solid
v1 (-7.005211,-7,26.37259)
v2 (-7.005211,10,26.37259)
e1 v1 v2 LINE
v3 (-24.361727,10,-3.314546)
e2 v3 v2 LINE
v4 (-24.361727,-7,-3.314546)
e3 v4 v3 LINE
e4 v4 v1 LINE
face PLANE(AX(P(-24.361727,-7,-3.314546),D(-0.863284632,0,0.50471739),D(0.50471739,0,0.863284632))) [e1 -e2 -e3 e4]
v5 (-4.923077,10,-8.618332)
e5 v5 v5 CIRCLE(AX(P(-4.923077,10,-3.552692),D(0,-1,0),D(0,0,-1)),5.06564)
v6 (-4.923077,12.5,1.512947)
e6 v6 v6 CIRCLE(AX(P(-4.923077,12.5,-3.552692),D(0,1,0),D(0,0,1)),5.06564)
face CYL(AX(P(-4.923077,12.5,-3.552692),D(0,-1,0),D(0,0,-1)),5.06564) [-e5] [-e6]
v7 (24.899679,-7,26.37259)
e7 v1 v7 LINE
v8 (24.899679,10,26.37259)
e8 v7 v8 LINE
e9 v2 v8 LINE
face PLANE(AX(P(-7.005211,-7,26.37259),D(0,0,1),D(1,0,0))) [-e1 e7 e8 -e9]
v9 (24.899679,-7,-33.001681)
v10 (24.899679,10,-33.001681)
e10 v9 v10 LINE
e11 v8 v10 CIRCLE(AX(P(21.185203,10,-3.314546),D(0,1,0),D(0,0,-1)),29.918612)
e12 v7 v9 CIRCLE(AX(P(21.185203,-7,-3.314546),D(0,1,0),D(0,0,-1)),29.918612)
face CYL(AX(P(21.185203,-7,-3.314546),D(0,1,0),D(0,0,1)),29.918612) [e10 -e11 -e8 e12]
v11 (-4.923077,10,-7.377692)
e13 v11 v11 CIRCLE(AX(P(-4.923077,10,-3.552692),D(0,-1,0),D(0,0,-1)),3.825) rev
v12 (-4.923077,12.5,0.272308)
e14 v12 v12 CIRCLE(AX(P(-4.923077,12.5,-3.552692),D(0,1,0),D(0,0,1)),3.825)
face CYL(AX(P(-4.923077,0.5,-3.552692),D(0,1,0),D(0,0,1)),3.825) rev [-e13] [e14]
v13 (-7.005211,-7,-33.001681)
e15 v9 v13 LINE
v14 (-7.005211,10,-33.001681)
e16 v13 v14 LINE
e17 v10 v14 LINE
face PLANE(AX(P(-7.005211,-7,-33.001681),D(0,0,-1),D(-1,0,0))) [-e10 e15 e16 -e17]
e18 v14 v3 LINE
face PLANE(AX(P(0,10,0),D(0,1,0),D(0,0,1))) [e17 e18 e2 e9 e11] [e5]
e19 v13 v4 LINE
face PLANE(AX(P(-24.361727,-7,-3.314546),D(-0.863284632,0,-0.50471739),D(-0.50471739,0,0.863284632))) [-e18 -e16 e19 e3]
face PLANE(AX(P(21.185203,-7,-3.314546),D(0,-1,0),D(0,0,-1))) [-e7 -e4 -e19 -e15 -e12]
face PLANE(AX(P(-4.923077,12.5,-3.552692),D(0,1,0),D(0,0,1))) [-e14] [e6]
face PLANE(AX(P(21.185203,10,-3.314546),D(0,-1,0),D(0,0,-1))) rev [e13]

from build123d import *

# Parameters (mm, degrees)
SKETCH2_W            = 49
SKETCH2_H            = 20
BOSS_EXTRUDE1_DEPTH  = 10
SKETCH3_W            = 30
SKETCH3_H            = 3.02
CUT_EXTRUDE1_DEPTH   = 2
SKETCH4_W            = 5
SKETCH4_H            = 6
CUT_EXTRUDE2_DEPTH   = 5
SKETCH5_R            = 7
CUT_EXTRUDE3_DEPTH   = 38.474986727
SKETCH12_W           = 5
SKETCH12_H           = 6
BOSS_EXTRUDE4_DEPTH  = 0.8
SKETCH14_W           = 29.5
SKETCH14_H           = 6
CUT_EXTRUDE6_DEPTH   = 42.177221974
SKETCH20_W           = 5
SKETCH20_H           = 6
BOSS_EXTRUDE6_DEPTH  = 4.2
SKETCH21_R           = 4.6
CUT_EXTRUDE8_DEPTH   = 0.5
SKETCH22_R           = 3.825
CUT_EXTRUDE9_DEPTH   = 4
SKETCH24_R           = 4.6
SKETCH24_R_2         = 4.25
CUT_EXTRUDE11_DEPTH  = 1
BOSS_EXTRUDE9_START  = 8
SKETCH26_R           = 5.065639608
SKETCH26_R_2         = 3.825
BOSS_EXTRUDE9_DEPTH  = 8
SKETCH27_R           = 7
SKETCH27_R_2         = 4.6
CUT_EXTRUDE12_DEPTH  = 1
FILLET1_R            = 0.5
SKETCH56_R           = 2
CUT_EXTRUDE13_DEPTH  = 2
SKETCH57_W           = 3
SKETCH57_H           = 6
BOSS_EXTRUDE19_DEPTH = 5.3
CUT_EXTRUDE14_REACH  = 50.729
SKETCH58_R           = 1.5
FILLET2_R            = 0.3
FILLET3_R            = 0.8
SKETCH60_W           = 19
SKETCH60_H           = 4
BOSS_EXTRUDE21_DEPTH = 1
SKETCH59_W           = 22.86
SKETCH59_H           = 13
BOSS_EXTRUDE20_DEPTH = 11
CUT_EXTRUDE15_REACH  = 49.914
SKETCH61_R           = 2.5
FILLET4_R            = 4
BOSS_EXTRUDE22_DEPTH = 17


with BuildPart() as part:
    # Sketch2 → Boss-Extrude1 (new body)
    with BuildSketch(Plane(origin=(0, 0, 0), x_dir=(1, 0, 0), z_dir=(0, 1, 0))):
        with Locations((10.076923077, 3.557692308)):
            Rectangle(SKETCH2_W, SKETCH2_H)
    extrude(amount=BOSS_EXTRUDE1_DEPTH)

    # Sketch3 → Cut-Extrude1 (cut)
    with BuildSketch(Plane.XZ):
        with Locations((12.576923077, -3.557692308)):
            Rectangle(SKETCH3_W, SKETCH3_H)
    extrude(amount=-CUT_EXTRUDE1_DEPTH, mode=Mode.SUBTRACT)

    # Sketch4 → Cut-Extrude2 (cut)
    with BuildSketch(Plane.XZ):
        with Locations((-4.923076923, -3.547692308)):
            Rectangle(SKETCH4_W, SKETCH4_H)
    extrude(amount=-CUT_EXTRUDE2_DEPTH, mode=Mode.SUBTRACT)

    # Sketch5 → Cut-Extrude3 (cut, through all)
    with BuildSketch(Plane.XZ.offset(-5)):
        with Locations(Location((-4.923076923, -3.552692308, 0), (0, 0, 270))):
            Circle(SKETCH5_R)
    extrude(amount=-CUT_EXTRUDE3_DEPTH, mode=Mode.SUBTRACT)

    # Sketch12 → Boss-Extrude4 (add)
    with BuildSketch(Plane.XZ):
        with Locations((-4.923076923, -3.547692308)):
            Rectangle(SKETCH12_W, SKETCH12_H)
    extrude(amount=-BOSS_EXTRUDE4_DEPTH)

    # Sketch14 → Cut-Extrude6 (cut, through all)
    with BuildSketch(Plane.XY.offset(6.442307692)):
        with Locations((19.826923077, 7)):
            Rectangle(SKETCH14_W, SKETCH14_H)
    extrude(amount=-CUT_EXTRUDE6_DEPTH, mode=Mode.SUBTRACT)

    # Sketch20 → Boss-Extrude6 (add)
    with BuildSketch(Plane(origin=(0, 0.8, 0), x_dir=(1, 0, 0), z_dir=(0, 1, 0))):
        with Locations((-4.923076923, 3.547692308)):
            Rectangle(SKETCH20_W, SKETCH20_H)
    extrude(amount=BOSS_EXTRUDE6_DEPTH)

    # Sketch21 → Cut-Extrude8 (cut)
    with BuildSketch(Plane(origin=(0, 5, 0), x_dir=(1, 0, 0), z_dir=(0, 1, 0))):
        with Locations(Location((-4.923076923, 3.552692308, 0), (0, 0, 270))):
            Circle(SKETCH21_R)
    extrude(amount=-CUT_EXTRUDE8_DEPTH, mode=Mode.SUBTRACT)

    # Sketch22 → Cut-Extrude9 (cut)
    with BuildSketch(Plane(origin=(0, 4.5, 0), x_dir=(1, 0, 0), z_dir=(0, 1, 0))):
        with Locations(Location((-4.923076923, 3.552692308, 0), (0, 0, 270))):
            Circle(SKETCH22_R)
    extrude(amount=-CUT_EXTRUDE9_DEPTH, mode=Mode.SUBTRACT)

    # Sketch24 → Cut-Extrude11 (cut)
    with BuildSketch(Plane(origin=(0, 5, 0), x_dir=(1, 0, 0), z_dir=(0, 1, 0))):
        with Locations(Location((-4.923076923, 3.552692308, 0), (0, 0, 270))):
            Circle(SKETCH24_R)
        with Locations(Location((-4.923076923, 3.552692308, 0), (0, 0, 270))):
            Circle(SKETCH24_R_2, mode=Mode.SUBTRACT)
    extrude(amount=-CUT_EXTRUDE11_DEPTH, mode=Mode.SUBTRACT)

    # Sketch26 → Boss-Extrude9 (add)
    with BuildSketch(Plane(origin=(0, 4.5, 0), x_dir=(1, 0, 0), z_dir=(0, 1, 0)).offset(BOSS_EXTRUDE9_START)):
        with Locations(Location((-4.923076923, 3.552692308, 0), (0, 0, 90))):
            Circle(SKETCH26_R)
        with Locations(Location((-4.923076923, 3.552692308, 0), (0, 0, 270))):
            Circle(SKETCH26_R_2, mode=Mode.SUBTRACT)
    extrude(amount=-BOSS_EXTRUDE9_DEPTH)

    # Sketch27 → Cut-Extrude12 (cut)
    with BuildSketch(Plane(origin=(0, 5, 0), x_dir=(1, 0, 0), z_dir=(0, 1, 0))):
        with Locations(Location((-4.923076923, 3.552692308, 0), (0, 0, 90))):
            Circle(SKETCH27_R)
        with Locations(Location((-4.923076923, 3.552692308, 0), (0, 0, 270))):
            Circle(SKETCH27_R_2, mode=Mode.SUBTRACT)
    extrude(amount=-CUT_EXTRUDE12_DEPTH, mode=Mode.SUBTRACT)

    # Fillet1
    fillet1_edges = [part.edges().sort_by_distance(p)[0] for p in [
        (5.076923077, 4, -3.557692308),
    ]]
    fillet(fillet1_edges, radius=FILLET1_R)

    # Sketch56 → Cut-Extrude13 (cut)
    with BuildSketch(Plane.XZ):
        with Locations((28.926923077, -3.557692308)):
            Circle(SKETCH56_R)
    extrude(amount=-CUT_EXTRUDE13_DEPTH, mode=Mode.SUBTRACT)

    # Sketch57 → Boss-Extrude19 (add)
    with BuildSketch(Plane(origin=(0, 4, 0), x_dir=(1, 0, 0), z_dir=(0, 1, 0))):
        with Locations((29.181923077, 3.557692308)):
            Rectangle(SKETCH57_W, SKETCH57_H)
        with Locations((22.931923077, 3.557692308)):
            Rectangle(SKETCH57_W, SKETCH57_H)
    extrude(amount=BOSS_EXTRUDE19_DEPTH)

    # Cut-Extrude14: up to this face of the body (flat: up to its plane)
    cut_extrude14_end = Plane(part.part.faces().sort_by_distance((21.431923077, 6.65, -3.557692308))[0])
    # Sketch58 → Cut-Extrude14 (cut, up to the picked face)
    with BuildSketch(Plane(origin=(30.681923077, 0, 0), x_dir=(0, 0, -1), z_dir=(1, 0, 0)), mode=Mode.PRIVATE) as cut_extrude14_sk1:
        with Locations(Location((3.557692308, 7, 0), (0, 0, 180))):
            Circle(SKETCH58_R)
    cut_extrude14_tool1 = split(extrude(cut_extrude14_sk1.sketch, amount=-CUT_EXTRUDE14_REACH, mode=Mode.PRIVATE), bisect_by=cut_extrude14_end, keep=Keep.BOTH, mode=Mode.PRIVATE)
    add(cut_extrude14_tool1.solids().sort_by(Axis((30.681923, 7, -3.557692), (-1, 0, 0)))[0], mode=Mode.SUBTRACT)

    # Fillet2
    fillet2_edges = [part.edges().sort_by_distance(p)[0] for p in [
        (27.681923077, 9.3, -3.557692308),
        (24.431923077, 9.3, -3.557692308),
    ]]
    fillet(fillet2_edges, radius=FILLET2_R)

    # Fillet3
    fillet3_edges = [part.edges().sort_by_distance(p)[0] for p in [
        (30.681923077, 4, -3.557692308),
        (30.681923077, 6.65, -0.557692308),
        (29.181923077, 4, -6.557692308),
        (30.681923077, 6.65, -6.557692308),
        (29.181923077, 4, -0.557692308),
        (21.431923077, 6.65, -6.557692308),
        (21.431923077, 6.65, -0.557692308),
        (22.931923077, 4, -6.557692308),
        (21.431923077, 4, -3.557692308),
        (22.931923077, 4, -0.557692308),
    ]]
    fillet(fillet3_edges, radius=FILLET3_R)

    # Sketch60 → Boss-Extrude21 (add)
    with BuildSketch(Plane(origin=(0, 0, -13.557692308), x_dir=(-1, 0, 0), z_dir=(0, 0, -1))):
        with Locations((-25.076923077, 2)):
            Rectangle(SKETCH60_W, SKETCH60_H)
    boss_extrude21 = extrude(amount=BOSS_EXTRUDE21_DEPTH)

    # Sketch59 → Boss-Extrude20 (add)
    with BuildSketch(Plane(origin=(0, 0, -14.557692308), x_dir=(-1, 0, 0), z_dir=(0, 0, -1))):
        with Locations((-26.956923077, 3.5)):
            Rectangle(SKETCH59_W, SKETCH59_H)
    boss_extrude20 = extrude(amount=BOSS_EXTRUDE20_DEPTH)

    # Mirror4: Boss-Extrude21, Boss-Extrude20 across plane
    add(boss_extrude21.mirror(Plane(origin=(0, 0, -3.557692308), x_dir=(1, 0, 0), z_dir=(0, 0, -1))))
    add(boss_extrude20.mirror(Plane(origin=(0, 0, -3.557692308), x_dir=(1, 0, 0), z_dir=(0, 0, -1))))

    # Sketch61 → Cut-Extrude15 (cut, up to next)
    with BuildSketch(Plane(origin=(0, 10, 0), x_dir=(1, 0, 0), z_dir=(0, 1, 0)), mode=Mode.PRIVATE) as cut_extrude15_sk1:
        with Locations(Location((20.406923077, 20.207692308, 0), (0, 0, 270))):
            Circle(SKETCH61_R)
    cut_extrude15_tool1 = extrude(cut_extrude15_sk1.sketch, amount=-CUT_EXTRUDE15_REACH, mode=Mode.PRIVATE) & part.part
    # Sketch61 → Cut-Extrude15 (cut, up to next)
    with BuildSketch(Plane(origin=(0, 10, 0), x_dir=(1, 0, 0), z_dir=(0, 1, 0)), mode=Mode.PRIVATE) as cut_extrude15_sk2:
        with Locations(Location((31.706923077, 20.207692308, 0), (0, 0, 270))):
            Circle(SKETCH61_R)
    cut_extrude15_tool2 = extrude(cut_extrude15_sk2.sketch, amount=-CUT_EXTRUDE15_REACH, mode=Mode.PRIVATE) & part.part
    # Sketch61 → Cut-Extrude15 (cut, up to next)
    with BuildSketch(Plane(origin=(0, 10, 0), x_dir=(1, 0, 0), z_dir=(0, 1, 0)), mode=Mode.PRIVATE) as cut_extrude15_sk3:
        with Locations(Location((31.706923077, -13.092307692, 0), (0, 0, 90))):
            Circle(SKETCH61_R)
    cut_extrude15_tool3 = extrude(cut_extrude15_sk3.sketch, amount=-CUT_EXTRUDE15_REACH, mode=Mode.PRIVATE) & part.part
    # Sketch61 → Cut-Extrude15 (cut, up to next)
    with BuildSketch(Plane(origin=(0, 10, 0), x_dir=(1, 0, 0), z_dir=(0, 1, 0)), mode=Mode.PRIVATE) as cut_extrude15_sk4:
        with Locations(Location((20.406923077, -13.092307692, 0), (0, 0, 90))):
            Circle(SKETCH61_R)
    cut_extrude15_tool4 = extrude(cut_extrude15_sk4.sketch, amount=-CUT_EXTRUDE15_REACH, mode=Mode.PRIVATE) & part.part
    add(cut_extrude15_tool1.solids().sort_by_distance((20.406923, 10, -20.207692))[0], mode=Mode.SUBTRACT)
    add(cut_extrude15_tool2.solids().sort_by_distance((31.706923, 10, -20.207692))[0], mode=Mode.SUBTRACT)
    add(cut_extrude15_tool3.solids().sort_by_distance((31.706923, 10, 13.092308))[0], mode=Mode.SUBTRACT)
    add(cut_extrude15_tool4.solids().sort_by_distance((20.406923, 10, 13.092308))[0], mode=Mode.SUBTRACT)

    # Fillet4
    # the kernel refuses this fillet: 4 mm, written as the material it takes off along each edge
    with BuildSketch(Plane(origin=(38.386923077, 20, -25.557692308), x_dir=(0, 0, 1), z_dir=(0, -1, 0)), Plane(origin=(15.526923077, -13, -25.557692308), x_dir=(0, 0, 1), z_dir=(0, 1, 0)), Plane(origin=(15.526923077, -13, 18.442307692), x_dir=(1, 0, 0), z_dir=(0, 1, 0))) as fillet4_piece_1:
        with BuildLine():
            CenterArc((FILLET4_R, FILLET4_R), FILLET4_R, 180, 90)
            Line((0, FILLET4_R), (0, 0))
            Line((0, 0), (FILLET4_R, 0))
        make_face()
    extrude(amount=33, mode=Mode.SUBTRACT)
    with BuildSketch(Plane(origin=(38.386923077, 20, -14.557692308), x_dir=(-1, 0, 0), z_dir=(0, -1, 0))) as fillet4_piece_2_section:
        with BuildLine():
            CenterArc((FILLET4_R, FILLET4_R), FILLET4_R, 180, 90)
            Line((0, FILLET4_R), (0, 0))
            Line((0, 0), (FILLET4_R, 0))
        make_face()
    fillet4_piece_2 = extrude(amount=33, mode=Mode.PRIVATE)
    fillet4_piece_2 = split(fillet4_piece_2, bisect_by=Plane(origin=(34.576923077, 12, -14.51845576), z_dir=(-1, 0, 0)), keep=Keep.TOP, mode=Mode.PRIVATE)
    fillet4_piece_2 = split(fillet4_piece_2, bisect_by=Plane(origin=(34.482800084, 4, -14.51845576), z_dir=(0, 1, 0)), keep=Keep.TOP, mode=Mode.PRIVATE)
    add(fillet4_piece_2, mode=Mode.SUBTRACT)
    with BuildSketch(Plane(origin=(38.386923077, 20, -14.557692308), x_dir=(-1, 0, 0), z_dir=(0, -1, 0))) as fillet4_piece_3_section:
        with BuildLine():
            CenterArc((FILLET4_R, FILLET4_R), FILLET4_R, 180, 90)
            Line((0, FILLET4_R), (0, 0))
            Line((0, 0), (FILLET4_R, 0))
        make_face()
    fillet4_piece_3 = extrude(amount=33, mode=Mode.PRIVATE)
    fillet4_piece_3 = split(fillet4_piece_3, bisect_by=Plane(origin=(34.576923077, 12, -15.466872512), z_dir=(1, 0, 0)), keep=Keep.TOP, mode=Mode.PRIVATE)
    fillet4_piece_3 = split(fillet4_piece_3, bisect_by=Plane(origin=(37.49276705, 4, -15.466872512), z_dir=(0, 1, 0)), keep=Keep.TOP, mode=Mode.PRIVATE)
    add(fillet4_piece_3, mode=Mode.SUBTRACT)
    with BuildSketch(Plane(origin=(38.386923077, 20, -14.557692308), x_dir=(-1, 0, 0), z_dir=(0, -1, 0))) as fillet4_piece_4_section:
        with BuildLine():
            CenterArc((FILLET4_R, FILLET4_R), FILLET4_R, 180, 90)
            Line((0, FILLET4_R), (0, 0))
            Line((0, 0), (FILLET4_R, 0))
        make_face()
    fillet4_piece_4 = extrude(amount=33, mode=Mode.PRIVATE)
    fillet4_piece_4 = split(fillet4_piece_4, bisect_by=Plane(origin=(34.576923077, 2, -15.466872512), z_dir=(1, 0, 0)), keep=Keep.TOP, mode=Mode.PRIVATE)
    fillet4_piece_4 = split(fillet4_piece_4, bisect_by=Plane(origin=(37.49276705, 0, -15.466872512), z_dir=(0, 1, 0)), keep=Keep.TOP, mode=Mode.PRIVATE)
    fillet4_piece_4 = split(fillet4_piece_4, bisect_by=Plane(origin=(37.49276705, 4, -15.466872512), z_dir=(0, -1, 0)), keep=Keep.TOP, mode=Mode.PRIVATE)
    add(fillet4_piece_4, mode=Mode.SUBTRACT)
    with BuildSketch(Plane(origin=(38.386923077, 20, -14.557692308), x_dir=(-1, 0, 0), z_dir=(0, -1, 0))) as fillet4_piece_5_section:
        with BuildLine():
            CenterArc((FILLET4_R, FILLET4_R), FILLET4_R, 180, 90)
            Line((0, FILLET4_R), (0, 0))
            Line((0, 0), (FILLET4_R, 0))
        make_face()
    fillet4_piece_5 = extrude(amount=33, mode=Mode.PRIVATE)
    fillet4_piece_5 = split(fillet4_piece_5, bisect_by=Plane(origin=(34.576923077, -6.5, -14.51845576), z_dir=(-1, 0, 0)), keep=Keep.TOP, mode=Mode.PRIVATE)
    fillet4_piece_5 = split(fillet4_piece_5, bisect_by=Plane(origin=(34.482800084, 0, -14.51845576), z_dir=(0, -1, 0)), keep=Keep.TOP, mode=Mode.PRIVATE)
    add(fillet4_piece_5, mode=Mode.SUBTRACT)
    with BuildSketch(Plane(origin=(38.386923077, 20, -14.557692308), x_dir=(-1, 0, 0), z_dir=(0, -1, 0))) as fillet4_piece_6_section:
        with BuildLine():
            CenterArc((FILLET4_R, FILLET4_R), FILLET4_R, 180, 90)
            Line((0, FILLET4_R), (0, 0))
            Line((0, 0), (FILLET4_R, 0))
        make_face()
    fillet4_piece_6 = extrude(amount=33, mode=Mode.PRIVATE)
    fillet4_piece_6 = split(fillet4_piece_6, bisect_by=Plane(origin=(34.576923077, -6.5, -15.466872512), z_dir=(1, 0, 0)), keep=Keep.TOP, mode=Mode.PRIVATE)
    fillet4_piece_6 = split(fillet4_piece_6, bisect_by=Plane(origin=(37.49276705, 0, -15.466872512), z_dir=(0, -1, 0)), keep=Keep.TOP, mode=Mode.PRIVATE)
    add(fillet4_piece_6, mode=Mode.SUBTRACT)
    with BuildSketch(Plane(origin=(38.386923077, 20, 7.442307692), x_dir=(0, 0, 1), z_dir=(0, -1, 0))) as fillet4_piece_7_section:
        with BuildLine():
            CenterArc((FILLET4_R, FILLET4_R), FILLET4_R, 180, 90)
            Line((0, FILLET4_R), (0, 0))
            Line((0, 0), (FILLET4_R, 0))
        make_face()
    fillet4_piece_7 = extrude(amount=33, mode=Mode.PRIVATE)
    fillet4_piece_7 = split(fillet4_piece_7, bisect_by=Plane(origin=(34.576923077, 12, 8.351487897), z_dir=(1, 0, 0)), keep=Keep.TOP, mode=Mode.PRIVATE)
    fillet4_piece_7 = split(fillet4_piece_7, bisect_by=Plane(origin=(37.49276705, 4, 8.351487897), z_dir=(0, 1, 0)), keep=Keep.TOP, mode=Mode.PRIVATE)
    add(fillet4_piece_7, mode=Mode.SUBTRACT)
    with BuildSketch(Plane(origin=(38.386923077, 20, 7.442307692), x_dir=(0, 0, 1), z_dir=(0, -1, 0))) as fillet4_piece_8_section:
        with BuildLine():
            CenterArc((FILLET4_R, FILLET4_R), FILLET4_R, 180, 90)
            Line((0, FILLET4_R), (0, 0))
            Line((0, 0), (FILLET4_R, 0))
        make_face()
    fillet4_piece_8 = extrude(amount=33, mode=Mode.PRIVATE)
    fillet4_piece_8 = split(fillet4_piece_8, bisect_by=Plane(origin=(34.576923077, 12, 7.403071145), z_dir=(-1, 0, 0)), keep=Keep.TOP, mode=Mode.PRIVATE)
    fillet4_piece_8 = split(fillet4_piece_8, bisect_by=Plane(origin=(34.482800084, 4, 7.403071145), z_dir=(0, 1, 0)), keep=Keep.TOP, mode=Mode.PRIVATE)
    add(fillet4_piece_8, mode=Mode.SUBTRACT)
    with BuildSketch(Plane(origin=(38.386923077, 20, 7.442307692), x_dir=(0, 0, 1), z_dir=(0, -1, 0))) as fillet4_piece_9_section:
        with BuildLine():
            CenterArc((FILLET4_R, FILLET4_R), FILLET4_R, 180, 90)
            Line((0, FILLET4_R), (0, 0))
            Line((0, 0), (FILLET4_R, 0))
        make_face()
    fillet4_piece_9 = extrude(amount=33, mode=Mode.PRIVATE)
    fillet4_piece_9 = split(fillet4_piece_9, bisect_by=Plane(origin=(34.576923077, 2, 8.351487897), z_dir=(1, 0, 0)), keep=Keep.TOP, mode=Mode.PRIVATE)
    fillet4_piece_9 = split(fillet4_piece_9, bisect_by=Plane(origin=(37.49276705, 0, 8.351487897), z_dir=(0, 1, 0)), keep=Keep.TOP, mode=Mode.PRIVATE)
    fillet4_piece_9 = split(fillet4_piece_9, bisect_by=Plane(origin=(37.49276705, 4, 8.351487897), z_dir=(0, -1, 0)), keep=Keep.TOP, mode=Mode.PRIVATE)
    add(fillet4_piece_9, mode=Mode.SUBTRACT)
    with BuildSketch(Plane(origin=(38.386923077, 20, 7.442307692), x_dir=(0, 0, 1), z_dir=(0, -1, 0))) as fillet4_piece_10_section:
        with BuildLine():
            CenterArc((FILLET4_R, FILLET4_R), FILLET4_R, 180, 90)
            Line((0, FILLET4_R), (0, 0))
            Line((0, 0), (FILLET4_R, 0))
        make_face()
    fillet4_piece_10 = extrude(amount=33, mode=Mode.PRIVATE)
    fillet4_piece_10 = split(fillet4_piece_10, bisect_by=Plane(origin=(34.576923077, -6.5, 8.351487897), z_dir=(1, 0, 0)), keep=Keep.TOP, mode=Mode.PRIVATE)
    fillet4_piece_10 = split(fillet4_piece_10, bisect_by=Plane(origin=(37.49276705, 0, 8.351487897), z_dir=(0, -1, 0)), keep=Keep.TOP, mode=Mode.PRIVATE)
    add(fillet4_piece_10, mode=Mode.SUBTRACT)
    with BuildSketch(Plane(origin=(38.386923077, 20, 7.442307692), x_dir=(0, 0, 1), z_dir=(0, -1, 0))) as fillet4_piece_11_section:
        with BuildLine():
            CenterArc((FILLET4_R, FILLET4_R), FILLET4_R, 180, 90)
            Line((0, FILLET4_R), (0, 0))
            Line((0, 0), (FILLET4_R, 0))
        make_face()
    fillet4_piece_11 = extrude(amount=33, mode=Mode.PRIVATE)
    fillet4_piece_11 = split(fillet4_piece_11, bisect_by=Plane(origin=(34.576923077, -6.5, 7.403071145), z_dir=(-1, 0, 0)), keep=Keep.TOP, mode=Mode.PRIVATE)
    fillet4_piece_11 = split(fillet4_piece_11, bisect_by=Plane(origin=(34.482800084, 0, 7.403071145), z_dir=(0, -1, 0)), keep=Keep.TOP, mode=Mode.PRIVATE)
    add(fillet4_piece_11, mode=Mode.SUBTRACT)
    with BuildSketch(Plane(origin=(38.386923077, 20, 18.442307692), x_dir=(0, 0, -1), z_dir=(0, -1, 0))) as fillet4_piece_12:
        with BuildLine():
            CenterArc((FILLET4_R, -FILLET4_R), FILLET4_R, 90, 90)
            Line((0, -FILLET4_R), (0, 0))
            Line((0, 0), (FILLET4_R, 0))
        make_face()
    extrude(amount=33, mode=Mode.SUBTRACT)
    with BuildSketch(Plane(origin=(-14.423076923, -10, 6.442307692), x_dir=(1, 0, 0), z_dir=(0, 1, 0))) as fillet4_piece_13:
        with BuildLine():
            CenterArc((FILLET4_R, FILLET4_R), FILLET4_R, 180, 90)
            Line((0, FILLET4_R), (0, 0))
            Line((0, 0), (FILLET4_R, 0))
        make_face()
    extrude(amount=30, mode=Mode.SUBTRACT)
    with BuildSketch(Plane(origin=(-14.423076923, -10, -13.557692308), x_dir=(1, 0, 0), z_dir=(0, 1, 0))) as fillet4_piece_14:
        with BuildLine():
            CenterArc((FILLET4_R, -FILLET4_R), FILLET4_R, 90, 90)
            Line((0, -FILLET4_R), (0, 0))
            Line((0, 0), (FILLET4_R, 0))
        make_face()
    extrude(amount=30, mode=Mode.SUBTRACT)

    # Sketch62 → Boss-Extrude22 (add)
    with BuildSketch(Plane(origin=(0, 10, 0), x_dir=(1, 0, 0), z_dir=(0, 1, 0))):
        with BuildLine():
            Line((-24.361726951, 3.314545782), (-7.005211005, -26.372589568))
            Line((-7.005211005, -26.372589568), (24.899678694, -26.372589568))
            ThreePointArc((24.899678694, -26.372589568), (51.103814887, 3.314545782), (24.899678694, 33.001681131))
            Line((24.899678694, 33.001681131), (-7.005211005, 33.001681131))
            Line((-7.005211005, 33.001681131), (-24.361726951, 3.314545782))
        make_face()
    extrude(amount=-BOSS_EXTRUDE22_DEPTH)


solid = part.part
